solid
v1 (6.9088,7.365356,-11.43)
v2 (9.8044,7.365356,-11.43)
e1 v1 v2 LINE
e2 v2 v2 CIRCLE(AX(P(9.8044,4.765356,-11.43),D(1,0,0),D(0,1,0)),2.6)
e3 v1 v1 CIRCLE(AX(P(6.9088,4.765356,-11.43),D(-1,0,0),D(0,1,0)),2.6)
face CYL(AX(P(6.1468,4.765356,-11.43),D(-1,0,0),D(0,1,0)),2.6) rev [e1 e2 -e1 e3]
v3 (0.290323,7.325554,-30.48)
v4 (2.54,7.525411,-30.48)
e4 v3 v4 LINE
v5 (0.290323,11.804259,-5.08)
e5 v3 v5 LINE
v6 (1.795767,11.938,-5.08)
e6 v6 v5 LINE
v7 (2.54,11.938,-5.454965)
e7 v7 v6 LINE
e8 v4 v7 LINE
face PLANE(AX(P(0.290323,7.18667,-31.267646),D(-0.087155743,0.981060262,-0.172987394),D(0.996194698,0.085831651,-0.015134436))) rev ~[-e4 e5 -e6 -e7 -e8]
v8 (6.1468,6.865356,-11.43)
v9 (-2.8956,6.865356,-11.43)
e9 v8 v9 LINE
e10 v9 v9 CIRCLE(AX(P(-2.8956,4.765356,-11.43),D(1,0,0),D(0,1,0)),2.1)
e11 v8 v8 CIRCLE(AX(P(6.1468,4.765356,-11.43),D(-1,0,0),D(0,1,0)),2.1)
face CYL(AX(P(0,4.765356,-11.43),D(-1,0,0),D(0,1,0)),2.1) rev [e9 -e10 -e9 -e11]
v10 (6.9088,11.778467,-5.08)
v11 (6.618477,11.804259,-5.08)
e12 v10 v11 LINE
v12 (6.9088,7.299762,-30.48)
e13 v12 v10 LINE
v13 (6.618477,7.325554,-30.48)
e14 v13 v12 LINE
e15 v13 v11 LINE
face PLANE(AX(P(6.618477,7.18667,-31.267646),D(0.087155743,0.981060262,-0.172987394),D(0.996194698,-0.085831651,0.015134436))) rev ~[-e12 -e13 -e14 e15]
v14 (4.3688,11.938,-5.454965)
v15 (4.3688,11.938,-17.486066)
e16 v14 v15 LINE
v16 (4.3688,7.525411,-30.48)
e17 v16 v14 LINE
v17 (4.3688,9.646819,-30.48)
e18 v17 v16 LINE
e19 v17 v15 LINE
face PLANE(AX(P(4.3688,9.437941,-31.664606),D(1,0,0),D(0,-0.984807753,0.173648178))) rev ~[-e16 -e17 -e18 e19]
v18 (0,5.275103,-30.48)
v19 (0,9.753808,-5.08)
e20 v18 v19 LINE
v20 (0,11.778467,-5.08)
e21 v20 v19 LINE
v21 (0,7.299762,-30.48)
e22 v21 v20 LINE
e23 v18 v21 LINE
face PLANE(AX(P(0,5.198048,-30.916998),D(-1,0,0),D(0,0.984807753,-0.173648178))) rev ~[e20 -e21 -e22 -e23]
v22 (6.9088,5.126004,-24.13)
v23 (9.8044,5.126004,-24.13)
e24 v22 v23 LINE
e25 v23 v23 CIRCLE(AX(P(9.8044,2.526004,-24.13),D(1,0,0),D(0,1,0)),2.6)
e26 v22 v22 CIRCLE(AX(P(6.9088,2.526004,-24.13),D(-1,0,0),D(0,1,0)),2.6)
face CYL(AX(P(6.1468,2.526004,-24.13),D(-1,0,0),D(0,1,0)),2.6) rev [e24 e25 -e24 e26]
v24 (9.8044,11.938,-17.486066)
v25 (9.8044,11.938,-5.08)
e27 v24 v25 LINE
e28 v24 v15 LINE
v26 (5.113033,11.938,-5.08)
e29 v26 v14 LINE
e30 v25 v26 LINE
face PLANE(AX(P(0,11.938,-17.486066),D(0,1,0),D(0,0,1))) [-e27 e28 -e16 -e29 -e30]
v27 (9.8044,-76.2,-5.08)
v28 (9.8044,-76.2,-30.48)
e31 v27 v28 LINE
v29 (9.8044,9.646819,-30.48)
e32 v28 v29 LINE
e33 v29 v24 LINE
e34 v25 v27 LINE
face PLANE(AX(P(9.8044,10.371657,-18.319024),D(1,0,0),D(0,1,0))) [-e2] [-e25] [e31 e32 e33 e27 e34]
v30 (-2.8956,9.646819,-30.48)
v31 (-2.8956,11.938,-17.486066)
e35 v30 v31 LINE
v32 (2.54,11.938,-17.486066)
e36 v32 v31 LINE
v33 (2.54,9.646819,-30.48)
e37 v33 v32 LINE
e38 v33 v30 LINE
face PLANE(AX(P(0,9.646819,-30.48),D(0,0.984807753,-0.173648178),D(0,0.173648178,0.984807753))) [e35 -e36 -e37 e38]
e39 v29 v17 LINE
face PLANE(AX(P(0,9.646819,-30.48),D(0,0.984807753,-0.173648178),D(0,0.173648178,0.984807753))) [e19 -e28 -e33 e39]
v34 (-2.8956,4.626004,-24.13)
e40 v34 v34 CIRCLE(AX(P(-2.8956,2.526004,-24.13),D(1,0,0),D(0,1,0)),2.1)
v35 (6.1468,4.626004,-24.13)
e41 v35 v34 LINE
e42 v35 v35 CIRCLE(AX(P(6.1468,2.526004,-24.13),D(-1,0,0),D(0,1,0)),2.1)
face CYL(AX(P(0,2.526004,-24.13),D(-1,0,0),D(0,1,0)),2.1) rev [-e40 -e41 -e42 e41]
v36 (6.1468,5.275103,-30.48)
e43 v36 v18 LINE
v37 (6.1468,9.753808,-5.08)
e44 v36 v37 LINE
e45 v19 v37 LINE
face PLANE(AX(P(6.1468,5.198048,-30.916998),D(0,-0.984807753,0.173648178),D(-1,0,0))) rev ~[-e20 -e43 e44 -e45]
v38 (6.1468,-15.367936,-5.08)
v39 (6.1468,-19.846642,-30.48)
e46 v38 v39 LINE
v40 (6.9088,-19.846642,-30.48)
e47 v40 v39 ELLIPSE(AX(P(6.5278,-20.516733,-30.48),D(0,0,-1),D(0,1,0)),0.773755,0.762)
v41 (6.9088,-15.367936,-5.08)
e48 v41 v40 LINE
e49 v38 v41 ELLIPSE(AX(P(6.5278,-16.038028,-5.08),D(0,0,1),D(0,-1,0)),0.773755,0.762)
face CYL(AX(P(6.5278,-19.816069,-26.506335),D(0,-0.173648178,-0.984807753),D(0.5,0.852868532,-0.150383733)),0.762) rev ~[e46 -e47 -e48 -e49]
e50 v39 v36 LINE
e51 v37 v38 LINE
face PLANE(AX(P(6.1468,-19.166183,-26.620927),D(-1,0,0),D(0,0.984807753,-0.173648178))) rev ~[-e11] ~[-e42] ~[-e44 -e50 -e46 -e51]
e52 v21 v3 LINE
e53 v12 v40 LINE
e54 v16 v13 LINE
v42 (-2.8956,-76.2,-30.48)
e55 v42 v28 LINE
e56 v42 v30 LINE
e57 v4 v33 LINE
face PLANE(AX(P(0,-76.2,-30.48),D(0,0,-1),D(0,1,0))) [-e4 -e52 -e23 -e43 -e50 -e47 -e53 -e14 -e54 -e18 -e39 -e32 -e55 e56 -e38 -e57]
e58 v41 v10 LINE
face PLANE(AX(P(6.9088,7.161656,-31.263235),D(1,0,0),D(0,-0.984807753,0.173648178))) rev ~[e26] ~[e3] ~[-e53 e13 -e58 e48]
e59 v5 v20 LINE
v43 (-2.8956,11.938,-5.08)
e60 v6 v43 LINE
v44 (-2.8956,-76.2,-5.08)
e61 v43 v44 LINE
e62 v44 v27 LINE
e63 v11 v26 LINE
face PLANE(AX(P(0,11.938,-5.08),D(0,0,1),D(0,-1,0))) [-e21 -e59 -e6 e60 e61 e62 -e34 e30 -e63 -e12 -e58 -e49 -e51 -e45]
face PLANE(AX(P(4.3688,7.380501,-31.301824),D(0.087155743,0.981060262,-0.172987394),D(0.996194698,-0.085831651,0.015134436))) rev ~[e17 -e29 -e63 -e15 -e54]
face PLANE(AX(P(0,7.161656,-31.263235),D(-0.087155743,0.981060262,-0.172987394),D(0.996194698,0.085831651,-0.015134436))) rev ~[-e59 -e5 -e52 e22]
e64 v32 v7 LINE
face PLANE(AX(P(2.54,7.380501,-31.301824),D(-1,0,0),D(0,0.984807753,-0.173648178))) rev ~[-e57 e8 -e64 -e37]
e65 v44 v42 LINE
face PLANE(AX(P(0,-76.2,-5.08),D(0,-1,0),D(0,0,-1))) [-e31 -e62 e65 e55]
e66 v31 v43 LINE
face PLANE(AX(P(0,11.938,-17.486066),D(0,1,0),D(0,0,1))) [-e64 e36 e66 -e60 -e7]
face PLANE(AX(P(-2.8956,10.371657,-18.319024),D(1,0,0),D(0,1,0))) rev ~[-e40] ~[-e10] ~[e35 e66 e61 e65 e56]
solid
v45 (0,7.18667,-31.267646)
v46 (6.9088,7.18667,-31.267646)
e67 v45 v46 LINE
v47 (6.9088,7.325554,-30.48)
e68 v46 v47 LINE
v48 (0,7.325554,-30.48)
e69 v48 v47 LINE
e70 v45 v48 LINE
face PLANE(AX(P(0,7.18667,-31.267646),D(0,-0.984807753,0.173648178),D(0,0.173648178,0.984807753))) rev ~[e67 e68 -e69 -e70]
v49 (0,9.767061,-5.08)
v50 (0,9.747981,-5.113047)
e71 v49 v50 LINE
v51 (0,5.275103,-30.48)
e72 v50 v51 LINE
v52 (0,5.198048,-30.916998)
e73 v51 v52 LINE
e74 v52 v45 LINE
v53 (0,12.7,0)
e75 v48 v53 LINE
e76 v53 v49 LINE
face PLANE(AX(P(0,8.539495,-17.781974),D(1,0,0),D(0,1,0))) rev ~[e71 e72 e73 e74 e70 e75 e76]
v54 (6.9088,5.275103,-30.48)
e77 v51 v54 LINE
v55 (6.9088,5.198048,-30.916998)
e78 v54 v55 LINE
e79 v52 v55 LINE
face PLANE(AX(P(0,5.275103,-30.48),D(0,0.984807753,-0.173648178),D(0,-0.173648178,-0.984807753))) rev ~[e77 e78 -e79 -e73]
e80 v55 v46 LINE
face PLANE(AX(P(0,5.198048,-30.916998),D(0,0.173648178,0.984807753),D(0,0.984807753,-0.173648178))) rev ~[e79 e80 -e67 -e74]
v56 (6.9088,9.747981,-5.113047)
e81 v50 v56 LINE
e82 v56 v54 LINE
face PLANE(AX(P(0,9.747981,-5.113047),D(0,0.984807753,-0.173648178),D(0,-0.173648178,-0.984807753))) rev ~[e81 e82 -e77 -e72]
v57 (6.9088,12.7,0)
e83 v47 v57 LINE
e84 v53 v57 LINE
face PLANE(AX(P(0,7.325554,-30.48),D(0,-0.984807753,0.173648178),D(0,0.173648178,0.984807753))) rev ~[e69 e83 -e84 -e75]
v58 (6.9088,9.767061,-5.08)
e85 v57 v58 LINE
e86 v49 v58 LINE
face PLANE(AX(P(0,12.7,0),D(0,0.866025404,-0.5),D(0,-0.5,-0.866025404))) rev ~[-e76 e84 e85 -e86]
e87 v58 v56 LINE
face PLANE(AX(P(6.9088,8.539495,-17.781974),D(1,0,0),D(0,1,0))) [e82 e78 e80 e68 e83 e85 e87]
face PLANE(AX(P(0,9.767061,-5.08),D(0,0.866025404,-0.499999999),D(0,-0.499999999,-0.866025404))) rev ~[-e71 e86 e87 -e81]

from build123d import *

# Parameters (mm, degrees)
F1_DEPTH      = 6.9088
F0_R          = 2.6
F0_R_2        = 2.1
F2_DEPTH      = 9.8044
F2_DEPTH_BACK = 2.8956
F4_DEPTH      = 31.751
F4_DEPTH_BACK = 14.4809433496
F5_R          = 2.6
F5_R_2        = 2.1
F6_DEPTH      = 3.6576


with BuildPart() as f1:
    # F0 (on Right) → F1 (new body)
    with BuildSketch(Plane.YZ):
        Polygon((7.325553628, -30.48), (11.804258938, -5.08), (9.7670606325, -5.08), (9.7479808874, -5.113047088), (5.2751026706, -30.48), align=None)
        Polygon((11.804258938, -5.08), (12.7, 0), (9.7670606325, -5.08), align=None)
        Polygon((7.1866703591, -31.2676461581), (7.325553628, -30.48), (5.2751026706, -30.48), (5.1980480634, -30.916998393), align=None)
    extrude(amount=F1_DEPTH)


with BuildPart() as f2:
    # F0 (on Right) → F2 (new body, two sides)
    with BuildSketch(Plane.YZ) as f2_sk:
        Polygon((11.938, -5.08), (11.804258938, -5.08), (7.325553628, -30.48), (9.6468188628, -30.48), (11.938, -17.486066071), align=None)
        Polygon((7.325553628, -30.48), (11.804258938, -5.08), (9.7670606325, -5.08), (9.7479808874, -5.113047088), (5.2751026706, -30.48), align=None)
        Polygon((9.7479808874, -5.113047088), (9.7670606325, -5.08), (-76.2, -5.08), (-76.2, -30.48), (5.2751026706, -30.48), align=None)
        with Locations((2.5260036068, -24.13)):
            Circle(F0_R, mode=Mode.SUBTRACT)
        with Locations((4.7653562618, -11.43)):
            Circle(F0_R, mode=Mode.SUBTRACT)
        with Locations((2.5260036068, -24.13)):
            Circle(F0_R)
        with Locations((2.5260036068, -24.13)):
            Circle(F0_R_2, mode=Mode.SUBTRACT)
        with Locations((4.7653562618, -11.43)):
            Circle(F0_R)
        with Locations((4.7653562618, -11.43)):
            Circle(F0_R_2, mode=Mode.SUBTRACT)
    extrude(amount=F2_DEPTH)
    extrude(f2_sk.sketch, amount=-F2_DEPTH_BACK)

    # F3 (on face) → F4 (cut, two sides)
    with BuildSketch(Plane(origin=(0, -5.1303777829, -29.095818248), x_dir=(1, 0, 0), z_dir=(0, -0.1736481777, -0.984807753))) as f4_sk:
        Polygon((6.1468, -10.4877584633), (0, -10.4877584633), (0, -12.4816584633), (0.2903233285, -12.5070584633), (6.6184766715, -12.5070584633), (6.9088, -12.4816584633), (6.9088, -10.4877584633), align=None)
        Polygon((6.6184766715, -12.5070584633), (0.2903233285, -12.5070584633), (2.54, -12.7038796686), (2.54, -14.7930584633), (4.3688, -14.7930584633), (4.3688, -12.7038796686), align=None)
        with BuildLine():
            Line((6.1468, 14.2523301791), (6.1468, -10.4877584633))
            Line((6.1468, -10.4877584633), (6.9088, -10.4877584633))
            Line((6.9088, -10.4877584633), (6.9088, 14.2523301791))
            ThreePointArc((6.9088, 14.2523301791), (6.5278, 15.6742415367), (6.1468, 14.2523301791))
        make_face()
    extrude(amount=-F4_DEPTH, mode=Mode.SUBTRACT)
    extrude(f4_sk.sketch, amount=F4_DEPTH_BACK, mode=Mode.SUBTRACT)

    # F5 (on face) → F6 (cut, through all)
    with BuildSketch(Plane.YZ.offset(6.1468)):
        with Locations((4.7653562618, -11.43)):
            Circle(F5_R)
        with Locations((4.7653562618, -11.43)):
            Circle(F5_R_2, mode=Mode.SUBTRACT)
        with Locations((2.5260036068, -24.13)):
            Circle(F5_R)
        with Locations((2.5260036068, -24.13)):
            Circle(F5_R_2, mode=Mode.SUBTRACT)
    extrude(amount=F6_DEPTH, mode=Mode.SUBTRACT)


solid = Compound([f1.part, f2.part])
